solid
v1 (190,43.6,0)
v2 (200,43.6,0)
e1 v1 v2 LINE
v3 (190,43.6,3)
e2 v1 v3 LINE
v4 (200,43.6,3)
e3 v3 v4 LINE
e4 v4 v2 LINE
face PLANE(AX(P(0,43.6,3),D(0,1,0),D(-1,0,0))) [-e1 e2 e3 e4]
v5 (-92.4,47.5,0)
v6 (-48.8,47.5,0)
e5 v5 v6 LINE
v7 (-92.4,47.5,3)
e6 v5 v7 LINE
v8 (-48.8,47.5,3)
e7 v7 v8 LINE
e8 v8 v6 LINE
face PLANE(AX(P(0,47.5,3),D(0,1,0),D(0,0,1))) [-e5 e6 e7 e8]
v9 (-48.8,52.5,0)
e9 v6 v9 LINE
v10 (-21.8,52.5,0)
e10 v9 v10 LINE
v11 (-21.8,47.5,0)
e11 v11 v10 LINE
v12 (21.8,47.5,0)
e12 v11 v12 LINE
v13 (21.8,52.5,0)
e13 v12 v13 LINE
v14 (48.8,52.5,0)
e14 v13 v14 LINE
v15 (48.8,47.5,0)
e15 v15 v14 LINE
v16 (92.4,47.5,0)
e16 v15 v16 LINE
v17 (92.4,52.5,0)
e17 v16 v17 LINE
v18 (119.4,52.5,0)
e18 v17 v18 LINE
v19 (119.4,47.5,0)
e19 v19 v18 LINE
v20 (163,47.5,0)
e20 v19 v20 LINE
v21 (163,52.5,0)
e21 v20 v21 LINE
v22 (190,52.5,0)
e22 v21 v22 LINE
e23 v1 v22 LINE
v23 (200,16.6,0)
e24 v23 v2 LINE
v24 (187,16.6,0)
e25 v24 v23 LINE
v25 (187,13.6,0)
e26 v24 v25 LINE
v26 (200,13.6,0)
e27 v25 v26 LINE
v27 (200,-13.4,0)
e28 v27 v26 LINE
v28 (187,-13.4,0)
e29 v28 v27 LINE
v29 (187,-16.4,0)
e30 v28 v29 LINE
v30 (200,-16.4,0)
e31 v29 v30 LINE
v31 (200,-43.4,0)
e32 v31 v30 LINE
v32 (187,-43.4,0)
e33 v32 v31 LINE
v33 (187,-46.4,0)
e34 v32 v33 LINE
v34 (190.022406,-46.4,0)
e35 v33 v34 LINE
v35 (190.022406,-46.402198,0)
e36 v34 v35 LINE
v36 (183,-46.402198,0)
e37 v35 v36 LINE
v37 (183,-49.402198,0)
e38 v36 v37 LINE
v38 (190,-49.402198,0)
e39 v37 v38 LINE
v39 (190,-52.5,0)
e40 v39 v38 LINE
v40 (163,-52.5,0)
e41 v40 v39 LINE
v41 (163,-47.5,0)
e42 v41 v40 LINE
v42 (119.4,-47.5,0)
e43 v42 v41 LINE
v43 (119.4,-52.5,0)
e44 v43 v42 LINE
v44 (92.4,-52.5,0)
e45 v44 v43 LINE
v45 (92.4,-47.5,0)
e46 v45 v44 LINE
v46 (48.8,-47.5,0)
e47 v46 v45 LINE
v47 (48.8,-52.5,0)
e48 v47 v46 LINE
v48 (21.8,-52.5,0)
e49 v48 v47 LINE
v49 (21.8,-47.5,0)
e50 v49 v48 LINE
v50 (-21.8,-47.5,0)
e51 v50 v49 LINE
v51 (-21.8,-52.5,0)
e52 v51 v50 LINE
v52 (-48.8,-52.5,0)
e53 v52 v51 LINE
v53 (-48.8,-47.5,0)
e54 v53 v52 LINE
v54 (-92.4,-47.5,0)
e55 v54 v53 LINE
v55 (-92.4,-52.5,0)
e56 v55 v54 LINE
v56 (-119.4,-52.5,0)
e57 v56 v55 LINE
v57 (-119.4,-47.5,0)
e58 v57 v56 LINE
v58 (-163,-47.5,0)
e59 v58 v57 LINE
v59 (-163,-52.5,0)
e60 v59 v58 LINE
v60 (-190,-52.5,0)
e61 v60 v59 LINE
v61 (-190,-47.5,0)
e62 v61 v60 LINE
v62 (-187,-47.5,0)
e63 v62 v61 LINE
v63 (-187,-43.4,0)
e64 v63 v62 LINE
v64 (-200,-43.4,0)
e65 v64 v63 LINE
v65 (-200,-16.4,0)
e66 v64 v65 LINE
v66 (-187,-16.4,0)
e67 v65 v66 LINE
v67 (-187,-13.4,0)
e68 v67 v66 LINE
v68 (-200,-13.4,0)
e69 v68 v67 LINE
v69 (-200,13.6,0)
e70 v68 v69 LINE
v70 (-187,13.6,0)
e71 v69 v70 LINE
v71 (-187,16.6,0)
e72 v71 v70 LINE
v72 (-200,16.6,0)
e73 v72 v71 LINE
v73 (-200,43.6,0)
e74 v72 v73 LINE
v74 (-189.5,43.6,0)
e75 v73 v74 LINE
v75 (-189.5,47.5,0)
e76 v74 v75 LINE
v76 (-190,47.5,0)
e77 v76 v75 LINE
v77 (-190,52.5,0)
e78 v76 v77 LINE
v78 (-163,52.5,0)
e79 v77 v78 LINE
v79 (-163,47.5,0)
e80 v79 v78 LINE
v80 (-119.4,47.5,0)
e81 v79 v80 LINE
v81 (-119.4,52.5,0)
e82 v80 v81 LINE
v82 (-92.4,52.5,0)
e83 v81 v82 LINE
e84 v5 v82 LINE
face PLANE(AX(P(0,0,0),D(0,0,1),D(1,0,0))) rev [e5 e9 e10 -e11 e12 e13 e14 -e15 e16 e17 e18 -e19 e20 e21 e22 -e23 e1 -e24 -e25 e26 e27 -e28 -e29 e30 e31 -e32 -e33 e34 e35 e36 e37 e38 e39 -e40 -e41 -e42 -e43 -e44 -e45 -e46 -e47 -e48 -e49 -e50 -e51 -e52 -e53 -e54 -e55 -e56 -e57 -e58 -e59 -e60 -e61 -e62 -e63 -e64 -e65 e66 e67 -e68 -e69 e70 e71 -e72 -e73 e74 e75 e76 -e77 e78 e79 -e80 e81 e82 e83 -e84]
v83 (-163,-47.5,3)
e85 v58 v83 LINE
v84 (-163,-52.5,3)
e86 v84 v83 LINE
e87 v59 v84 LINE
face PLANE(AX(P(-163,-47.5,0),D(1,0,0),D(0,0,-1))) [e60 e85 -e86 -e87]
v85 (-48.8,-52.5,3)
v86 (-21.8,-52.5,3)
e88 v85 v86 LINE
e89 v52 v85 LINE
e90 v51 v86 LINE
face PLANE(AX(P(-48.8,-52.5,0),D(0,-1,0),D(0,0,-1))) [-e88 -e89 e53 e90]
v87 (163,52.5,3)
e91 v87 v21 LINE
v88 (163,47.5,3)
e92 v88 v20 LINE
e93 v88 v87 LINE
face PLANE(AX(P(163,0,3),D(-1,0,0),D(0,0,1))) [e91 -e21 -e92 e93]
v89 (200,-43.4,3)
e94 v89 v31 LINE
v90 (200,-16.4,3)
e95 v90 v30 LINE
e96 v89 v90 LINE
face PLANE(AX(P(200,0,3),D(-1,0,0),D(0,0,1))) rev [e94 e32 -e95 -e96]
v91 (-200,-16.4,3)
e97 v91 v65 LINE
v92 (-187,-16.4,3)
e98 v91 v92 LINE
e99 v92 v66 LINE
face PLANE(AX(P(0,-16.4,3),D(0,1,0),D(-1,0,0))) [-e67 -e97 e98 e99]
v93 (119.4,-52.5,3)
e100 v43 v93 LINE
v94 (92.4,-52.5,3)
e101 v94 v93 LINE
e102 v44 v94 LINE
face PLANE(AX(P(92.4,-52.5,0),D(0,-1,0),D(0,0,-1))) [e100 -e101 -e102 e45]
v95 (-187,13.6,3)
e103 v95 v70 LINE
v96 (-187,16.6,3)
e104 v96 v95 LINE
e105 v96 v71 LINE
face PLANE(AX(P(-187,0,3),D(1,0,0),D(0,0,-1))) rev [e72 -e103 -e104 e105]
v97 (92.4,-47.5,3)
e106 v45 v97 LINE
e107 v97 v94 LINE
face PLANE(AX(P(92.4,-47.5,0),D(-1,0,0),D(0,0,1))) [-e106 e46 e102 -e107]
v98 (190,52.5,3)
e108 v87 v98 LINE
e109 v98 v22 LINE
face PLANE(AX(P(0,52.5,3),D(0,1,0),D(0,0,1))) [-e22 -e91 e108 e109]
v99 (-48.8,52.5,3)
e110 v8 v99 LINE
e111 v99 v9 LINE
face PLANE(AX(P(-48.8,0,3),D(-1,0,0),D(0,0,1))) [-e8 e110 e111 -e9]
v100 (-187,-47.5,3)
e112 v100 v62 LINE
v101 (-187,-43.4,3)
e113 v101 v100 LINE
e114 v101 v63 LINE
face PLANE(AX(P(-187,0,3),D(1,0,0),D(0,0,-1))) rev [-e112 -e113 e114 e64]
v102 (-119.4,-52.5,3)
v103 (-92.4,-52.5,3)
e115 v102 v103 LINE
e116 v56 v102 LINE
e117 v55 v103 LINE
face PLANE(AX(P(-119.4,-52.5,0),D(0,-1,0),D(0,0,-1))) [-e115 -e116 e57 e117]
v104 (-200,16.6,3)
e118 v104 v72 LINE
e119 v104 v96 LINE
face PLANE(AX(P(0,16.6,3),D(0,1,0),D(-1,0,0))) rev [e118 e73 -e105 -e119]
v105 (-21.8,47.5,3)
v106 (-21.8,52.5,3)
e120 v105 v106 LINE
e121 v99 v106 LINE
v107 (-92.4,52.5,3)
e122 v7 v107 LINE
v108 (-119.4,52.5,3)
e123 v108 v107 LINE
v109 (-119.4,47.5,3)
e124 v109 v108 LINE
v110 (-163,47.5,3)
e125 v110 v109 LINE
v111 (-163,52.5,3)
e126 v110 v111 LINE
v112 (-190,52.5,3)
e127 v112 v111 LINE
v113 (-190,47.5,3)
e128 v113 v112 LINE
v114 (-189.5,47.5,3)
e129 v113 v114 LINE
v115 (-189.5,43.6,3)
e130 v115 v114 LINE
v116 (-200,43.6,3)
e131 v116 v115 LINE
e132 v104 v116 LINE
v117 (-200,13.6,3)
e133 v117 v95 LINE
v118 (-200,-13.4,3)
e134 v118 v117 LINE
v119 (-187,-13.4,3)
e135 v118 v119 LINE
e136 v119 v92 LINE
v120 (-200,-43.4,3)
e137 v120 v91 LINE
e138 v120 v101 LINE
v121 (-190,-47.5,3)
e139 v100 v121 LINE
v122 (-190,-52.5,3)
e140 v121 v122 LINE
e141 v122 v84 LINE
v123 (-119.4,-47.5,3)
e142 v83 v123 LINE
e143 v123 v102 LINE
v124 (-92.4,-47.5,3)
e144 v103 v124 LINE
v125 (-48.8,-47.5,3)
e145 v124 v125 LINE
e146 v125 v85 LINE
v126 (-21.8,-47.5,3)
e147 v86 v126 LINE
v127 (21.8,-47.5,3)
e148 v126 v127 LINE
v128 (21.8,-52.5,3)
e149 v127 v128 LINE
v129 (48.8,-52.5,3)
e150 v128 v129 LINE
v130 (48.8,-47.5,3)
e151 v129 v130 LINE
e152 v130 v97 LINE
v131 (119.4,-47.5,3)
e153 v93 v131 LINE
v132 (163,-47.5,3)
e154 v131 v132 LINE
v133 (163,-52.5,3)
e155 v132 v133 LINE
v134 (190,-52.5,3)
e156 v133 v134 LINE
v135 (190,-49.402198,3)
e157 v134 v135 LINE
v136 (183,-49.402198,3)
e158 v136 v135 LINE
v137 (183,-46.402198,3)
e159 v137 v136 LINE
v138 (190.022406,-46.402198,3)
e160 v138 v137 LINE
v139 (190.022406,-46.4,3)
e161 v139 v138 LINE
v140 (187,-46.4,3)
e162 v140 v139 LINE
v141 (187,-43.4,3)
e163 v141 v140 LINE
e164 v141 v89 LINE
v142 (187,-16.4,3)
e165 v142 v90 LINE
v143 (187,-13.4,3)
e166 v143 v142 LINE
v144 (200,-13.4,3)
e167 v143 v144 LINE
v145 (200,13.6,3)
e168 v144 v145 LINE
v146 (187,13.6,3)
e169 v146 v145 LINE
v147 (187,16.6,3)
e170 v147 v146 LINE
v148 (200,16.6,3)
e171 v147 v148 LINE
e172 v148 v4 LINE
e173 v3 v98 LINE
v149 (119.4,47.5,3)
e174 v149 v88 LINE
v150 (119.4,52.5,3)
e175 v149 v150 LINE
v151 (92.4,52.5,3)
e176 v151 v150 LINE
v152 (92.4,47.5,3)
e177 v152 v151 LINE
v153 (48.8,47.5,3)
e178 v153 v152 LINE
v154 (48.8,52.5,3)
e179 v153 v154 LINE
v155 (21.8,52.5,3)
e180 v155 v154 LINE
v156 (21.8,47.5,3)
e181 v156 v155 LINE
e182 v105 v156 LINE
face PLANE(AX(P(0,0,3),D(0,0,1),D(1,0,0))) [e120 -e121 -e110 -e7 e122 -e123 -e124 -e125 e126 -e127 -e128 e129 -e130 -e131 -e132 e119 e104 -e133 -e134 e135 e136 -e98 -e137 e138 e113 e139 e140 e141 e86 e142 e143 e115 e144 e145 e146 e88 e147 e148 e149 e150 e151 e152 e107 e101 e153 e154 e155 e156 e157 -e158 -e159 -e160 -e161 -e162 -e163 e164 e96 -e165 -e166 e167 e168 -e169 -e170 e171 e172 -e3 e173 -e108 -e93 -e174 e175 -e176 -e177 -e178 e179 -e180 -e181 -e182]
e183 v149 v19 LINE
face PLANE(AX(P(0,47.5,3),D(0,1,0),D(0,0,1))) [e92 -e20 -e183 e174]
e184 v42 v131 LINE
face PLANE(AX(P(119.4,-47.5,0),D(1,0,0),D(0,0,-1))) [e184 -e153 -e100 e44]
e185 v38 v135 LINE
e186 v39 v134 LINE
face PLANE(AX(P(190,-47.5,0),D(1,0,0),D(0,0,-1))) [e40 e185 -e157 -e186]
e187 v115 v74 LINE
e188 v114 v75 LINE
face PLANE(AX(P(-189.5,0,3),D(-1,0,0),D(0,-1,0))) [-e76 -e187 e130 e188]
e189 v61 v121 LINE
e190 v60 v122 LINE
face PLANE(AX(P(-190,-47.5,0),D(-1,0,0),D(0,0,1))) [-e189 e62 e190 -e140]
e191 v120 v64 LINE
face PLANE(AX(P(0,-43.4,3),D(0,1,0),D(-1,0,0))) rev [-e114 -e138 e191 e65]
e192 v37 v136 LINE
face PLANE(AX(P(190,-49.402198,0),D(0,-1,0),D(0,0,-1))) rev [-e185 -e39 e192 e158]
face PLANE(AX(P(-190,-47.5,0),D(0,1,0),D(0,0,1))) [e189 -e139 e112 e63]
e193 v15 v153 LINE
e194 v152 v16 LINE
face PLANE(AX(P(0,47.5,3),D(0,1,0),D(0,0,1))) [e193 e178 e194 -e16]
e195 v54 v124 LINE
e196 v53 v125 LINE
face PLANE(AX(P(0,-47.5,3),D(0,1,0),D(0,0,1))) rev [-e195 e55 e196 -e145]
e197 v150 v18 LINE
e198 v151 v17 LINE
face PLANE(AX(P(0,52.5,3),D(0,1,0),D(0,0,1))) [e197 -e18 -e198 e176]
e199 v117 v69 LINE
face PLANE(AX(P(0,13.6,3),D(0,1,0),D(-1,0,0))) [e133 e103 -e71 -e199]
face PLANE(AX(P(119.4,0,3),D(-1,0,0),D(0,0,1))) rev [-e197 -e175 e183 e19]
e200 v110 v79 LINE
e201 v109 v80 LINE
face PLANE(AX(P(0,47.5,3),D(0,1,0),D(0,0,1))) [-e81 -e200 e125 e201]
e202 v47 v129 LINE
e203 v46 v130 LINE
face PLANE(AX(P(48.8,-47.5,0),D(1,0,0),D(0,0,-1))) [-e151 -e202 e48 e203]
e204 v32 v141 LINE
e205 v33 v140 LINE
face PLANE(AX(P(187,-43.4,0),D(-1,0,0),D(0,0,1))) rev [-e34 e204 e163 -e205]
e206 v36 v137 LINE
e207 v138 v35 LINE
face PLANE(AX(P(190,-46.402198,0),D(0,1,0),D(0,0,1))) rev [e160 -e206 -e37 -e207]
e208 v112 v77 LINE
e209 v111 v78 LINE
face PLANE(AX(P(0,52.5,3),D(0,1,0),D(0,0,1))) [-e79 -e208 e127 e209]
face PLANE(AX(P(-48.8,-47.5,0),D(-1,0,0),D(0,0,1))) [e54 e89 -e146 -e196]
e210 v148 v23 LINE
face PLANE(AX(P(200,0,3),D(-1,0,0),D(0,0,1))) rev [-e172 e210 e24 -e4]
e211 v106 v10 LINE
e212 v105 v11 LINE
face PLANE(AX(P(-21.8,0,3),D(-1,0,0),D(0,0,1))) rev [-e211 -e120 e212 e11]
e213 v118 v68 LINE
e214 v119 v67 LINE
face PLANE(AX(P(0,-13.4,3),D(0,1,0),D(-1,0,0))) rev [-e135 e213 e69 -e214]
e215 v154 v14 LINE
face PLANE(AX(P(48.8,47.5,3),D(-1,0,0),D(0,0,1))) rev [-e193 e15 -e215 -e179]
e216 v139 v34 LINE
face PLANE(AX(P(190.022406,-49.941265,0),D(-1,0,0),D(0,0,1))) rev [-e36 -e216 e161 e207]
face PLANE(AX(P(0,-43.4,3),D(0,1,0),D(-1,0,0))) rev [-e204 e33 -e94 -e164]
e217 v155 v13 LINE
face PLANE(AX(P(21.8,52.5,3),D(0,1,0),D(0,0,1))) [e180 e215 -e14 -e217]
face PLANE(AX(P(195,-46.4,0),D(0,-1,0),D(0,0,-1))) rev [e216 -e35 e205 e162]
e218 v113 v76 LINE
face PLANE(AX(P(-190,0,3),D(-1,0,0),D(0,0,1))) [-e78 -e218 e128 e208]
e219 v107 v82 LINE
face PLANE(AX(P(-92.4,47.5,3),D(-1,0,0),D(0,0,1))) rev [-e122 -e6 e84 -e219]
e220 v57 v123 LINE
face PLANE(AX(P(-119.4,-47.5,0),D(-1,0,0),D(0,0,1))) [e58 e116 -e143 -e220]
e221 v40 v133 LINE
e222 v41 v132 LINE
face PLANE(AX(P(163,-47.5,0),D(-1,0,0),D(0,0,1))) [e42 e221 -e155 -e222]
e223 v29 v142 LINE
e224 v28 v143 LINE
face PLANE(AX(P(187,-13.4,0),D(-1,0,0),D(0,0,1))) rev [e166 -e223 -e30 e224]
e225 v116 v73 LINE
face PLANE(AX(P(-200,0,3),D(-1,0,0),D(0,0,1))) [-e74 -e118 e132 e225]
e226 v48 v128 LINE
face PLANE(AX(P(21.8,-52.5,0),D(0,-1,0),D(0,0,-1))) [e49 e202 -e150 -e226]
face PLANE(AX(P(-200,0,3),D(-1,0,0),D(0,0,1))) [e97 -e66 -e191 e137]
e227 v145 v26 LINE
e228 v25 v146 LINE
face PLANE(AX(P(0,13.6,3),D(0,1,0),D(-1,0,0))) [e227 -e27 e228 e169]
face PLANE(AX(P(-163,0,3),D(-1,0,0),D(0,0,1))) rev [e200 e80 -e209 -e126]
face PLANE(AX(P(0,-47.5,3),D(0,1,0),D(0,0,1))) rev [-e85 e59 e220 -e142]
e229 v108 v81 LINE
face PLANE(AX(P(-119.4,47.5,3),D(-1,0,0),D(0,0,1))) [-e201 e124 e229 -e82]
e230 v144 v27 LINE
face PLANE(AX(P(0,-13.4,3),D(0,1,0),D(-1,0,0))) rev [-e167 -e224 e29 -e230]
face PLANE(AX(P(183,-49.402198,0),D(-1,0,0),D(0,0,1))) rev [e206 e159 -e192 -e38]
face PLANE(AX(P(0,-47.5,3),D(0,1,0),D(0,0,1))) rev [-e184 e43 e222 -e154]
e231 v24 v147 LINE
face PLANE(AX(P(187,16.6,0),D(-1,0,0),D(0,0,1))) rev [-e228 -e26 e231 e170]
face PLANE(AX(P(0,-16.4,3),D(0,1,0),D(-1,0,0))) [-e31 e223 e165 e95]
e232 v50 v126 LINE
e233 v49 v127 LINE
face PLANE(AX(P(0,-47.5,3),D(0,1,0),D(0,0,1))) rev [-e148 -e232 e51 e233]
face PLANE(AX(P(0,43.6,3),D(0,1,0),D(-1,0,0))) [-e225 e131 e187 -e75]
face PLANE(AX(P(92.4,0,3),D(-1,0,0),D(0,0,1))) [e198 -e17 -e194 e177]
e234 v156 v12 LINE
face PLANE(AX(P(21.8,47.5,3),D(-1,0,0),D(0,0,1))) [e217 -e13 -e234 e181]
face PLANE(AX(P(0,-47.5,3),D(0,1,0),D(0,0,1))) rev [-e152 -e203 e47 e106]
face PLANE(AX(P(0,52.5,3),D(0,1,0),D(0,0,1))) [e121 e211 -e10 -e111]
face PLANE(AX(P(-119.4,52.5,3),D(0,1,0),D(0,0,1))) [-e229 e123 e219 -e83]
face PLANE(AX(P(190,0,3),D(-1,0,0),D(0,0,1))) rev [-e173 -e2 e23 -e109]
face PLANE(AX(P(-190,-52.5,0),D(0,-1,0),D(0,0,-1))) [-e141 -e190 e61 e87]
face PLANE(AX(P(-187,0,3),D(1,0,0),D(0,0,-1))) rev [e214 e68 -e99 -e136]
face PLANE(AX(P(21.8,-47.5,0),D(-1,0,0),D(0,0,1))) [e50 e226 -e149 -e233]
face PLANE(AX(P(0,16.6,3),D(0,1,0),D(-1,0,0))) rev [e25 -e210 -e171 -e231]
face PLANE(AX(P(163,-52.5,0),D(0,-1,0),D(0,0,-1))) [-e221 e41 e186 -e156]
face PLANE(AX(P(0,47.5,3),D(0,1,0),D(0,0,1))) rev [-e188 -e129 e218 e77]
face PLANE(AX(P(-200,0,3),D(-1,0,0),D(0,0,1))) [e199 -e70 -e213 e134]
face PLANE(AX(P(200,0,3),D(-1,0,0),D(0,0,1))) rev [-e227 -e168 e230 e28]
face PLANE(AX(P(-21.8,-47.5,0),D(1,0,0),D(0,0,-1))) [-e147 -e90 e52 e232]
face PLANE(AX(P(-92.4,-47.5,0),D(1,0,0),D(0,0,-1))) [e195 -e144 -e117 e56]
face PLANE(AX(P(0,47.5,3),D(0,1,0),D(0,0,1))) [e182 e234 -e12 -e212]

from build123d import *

# Parameters (mm, degrees)
BOSS_EXTRUDE1_DEPTH = 3
SKETCH3_W           = 27
SKETCH3_H           = 5
BOSS_EXTRUDE2_DEPTH = 3
SKETCH4_W           = 8
SKETCH4_H           = 3
CUT_EXTRUDE1_DEPTH  = 3
SKETCH5_W           = 5
SKETCH5_H           = 3.9
CUT_EXTRUDE2_DEPTH  = 3
SKETCH6_W           = 5
SKETCH6_H           = 4.739085619
CUT_EXTRUDE3_DEPTH  = 3
SKETCH7_W           = 7
SKETCH7_H           = 3
CUT_EXTRUDE5_DEPTH  = 3
SKETCH8_W           = 4.245961236
SKETCH8_H           = 1.503952676
CUT_EXTRUDE6_DEPTH  = 10


# Read off the part's stored shape, not the designer's step: Boss-Extrude1
with BuildPart() as part:
    # Boss-Extrude1 outline → Boss-Extrude1 (new body)
    with BuildSketch(Plane.XY):
        Polygon((195, -43.4), (200, -43.4), (200, -16.4), (195, -16.4), (195, -13.4), (200, -13.4), (200, 13.6), (195, 13.6), (195, 16.6), (200, 16.6), (200, 43.6), (195, 43.6), (195, 47.5), (190, 47.5), (190, 52.5), (163, 52.5), (163, 47.5), (119.4, 47.5), (119.4, 52.5), (92.4, 52.5), (92.4, 47.5), (48.8, 47.5), (48.8, 52.5), (21.8, 52.5), (21.8, 47.5), (-21.8, 47.5), (-21.8, 52.5), (-48.8, 52.5), (-48.8, 47.5), (-92.4, 47.5), (-92.4, 52.5), (-119.4, 52.5), (-119.4, 47.5), (-163, 47.5), (-163, 52.5), (-190, 52.5), (-190, 47.5), (-189.5, 47.5), (-189.5, 43.6), (-200, 43.6), (-200, 16.6), (-187, 16.6), (-187, 13.6), (-200, 13.6), (-200, -13.4), (-187, -13.4), (-187, -16.4), (-200, -16.4), (-200, -43.4), (-187, -43.4), (-187, -47.5), (195, -47.5), align=None)
    extrude(amount=BOSS_EXTRUDE1_DEPTH)

    # Sketch3 → Boss-Extrude2 (add)
    with BuildSketch(Plane.XY.offset(3)):
        with Locations((-176.5, -50)):
            Rectangle(SKETCH3_W, SKETCH3_H)
        with Locations((-105.9, -50)):
            Rectangle(SKETCH3_W, SKETCH3_H)
        with Locations((-35.3, -50)):
            Rectangle(SKETCH3_W, SKETCH3_H)
        with Locations((35.3, -50)):
            Rectangle(SKETCH3_W, SKETCH3_H)
        with Locations((105.9, -50)):
            Rectangle(SKETCH3_W, SKETCH3_H)
        with Locations((176.5, -50)):
            Rectangle(SKETCH3_W, SKETCH3_H)
    extrude(amount=-BOSS_EXTRUDE2_DEPTH)

    # Sketch4 → Cut-Extrude1 (cut)
    with BuildSketch(Plane.XY.offset(3)):
        with Locations((191, -14.9)):
            Rectangle(SKETCH4_W, SKETCH4_H)
        with Locations((191, 15.1)):
            Rectangle(SKETCH4_W, SKETCH4_H)
        with Locations((191, -44.9)):
            Rectangle(SKETCH4_W, SKETCH4_H)
    extrude(amount=-CUT_EXTRUDE1_DEPTH, mode=Mode.SUBTRACT)

    # Sketch5 → Cut-Extrude2 (cut)
    with BuildSketch(Plane.XY.offset(3)):
        with Locations((192.5, 45.55)):
            Rectangle(SKETCH5_W, SKETCH5_H)
    extrude(amount=-CUT_EXTRUDE2_DEPTH, mode=Mode.SUBTRACT)

    # Sketch6 → Cut-Extrude3 (cut)
    with BuildSketch(Plane.XY.offset(3)):
        with Locations((192.522405585, -47.571722604)):
            Rectangle(SKETCH6_W, SKETCH6_H)
    extrude(amount=-CUT_EXTRUDE3_DEPTH, mode=Mode.SUBTRACT)

    # Sketch7 → Cut-Extrude5 (cut)
    with BuildSketch(Plane.XY.offset(3)):
        with Locations((186.5, -47.902198406)):
            Rectangle(SKETCH7_W, SKETCH7_H)
    extrude(amount=-CUT_EXTRUDE5_DEPTH, mode=Mode.SUBTRACT)

    # Sketch8 → Cut-Extrude6 (cut)
    with BuildSketch(Plane.XY.offset(3)):
        with Locations((189.30979268, -47.154174744)):
            Rectangle(SKETCH8_W, SKETCH8_H)
    extrude(amount=-CUT_EXTRUDE6_DEPTH, mode=Mode.SUBTRACT)


solid = part.part
